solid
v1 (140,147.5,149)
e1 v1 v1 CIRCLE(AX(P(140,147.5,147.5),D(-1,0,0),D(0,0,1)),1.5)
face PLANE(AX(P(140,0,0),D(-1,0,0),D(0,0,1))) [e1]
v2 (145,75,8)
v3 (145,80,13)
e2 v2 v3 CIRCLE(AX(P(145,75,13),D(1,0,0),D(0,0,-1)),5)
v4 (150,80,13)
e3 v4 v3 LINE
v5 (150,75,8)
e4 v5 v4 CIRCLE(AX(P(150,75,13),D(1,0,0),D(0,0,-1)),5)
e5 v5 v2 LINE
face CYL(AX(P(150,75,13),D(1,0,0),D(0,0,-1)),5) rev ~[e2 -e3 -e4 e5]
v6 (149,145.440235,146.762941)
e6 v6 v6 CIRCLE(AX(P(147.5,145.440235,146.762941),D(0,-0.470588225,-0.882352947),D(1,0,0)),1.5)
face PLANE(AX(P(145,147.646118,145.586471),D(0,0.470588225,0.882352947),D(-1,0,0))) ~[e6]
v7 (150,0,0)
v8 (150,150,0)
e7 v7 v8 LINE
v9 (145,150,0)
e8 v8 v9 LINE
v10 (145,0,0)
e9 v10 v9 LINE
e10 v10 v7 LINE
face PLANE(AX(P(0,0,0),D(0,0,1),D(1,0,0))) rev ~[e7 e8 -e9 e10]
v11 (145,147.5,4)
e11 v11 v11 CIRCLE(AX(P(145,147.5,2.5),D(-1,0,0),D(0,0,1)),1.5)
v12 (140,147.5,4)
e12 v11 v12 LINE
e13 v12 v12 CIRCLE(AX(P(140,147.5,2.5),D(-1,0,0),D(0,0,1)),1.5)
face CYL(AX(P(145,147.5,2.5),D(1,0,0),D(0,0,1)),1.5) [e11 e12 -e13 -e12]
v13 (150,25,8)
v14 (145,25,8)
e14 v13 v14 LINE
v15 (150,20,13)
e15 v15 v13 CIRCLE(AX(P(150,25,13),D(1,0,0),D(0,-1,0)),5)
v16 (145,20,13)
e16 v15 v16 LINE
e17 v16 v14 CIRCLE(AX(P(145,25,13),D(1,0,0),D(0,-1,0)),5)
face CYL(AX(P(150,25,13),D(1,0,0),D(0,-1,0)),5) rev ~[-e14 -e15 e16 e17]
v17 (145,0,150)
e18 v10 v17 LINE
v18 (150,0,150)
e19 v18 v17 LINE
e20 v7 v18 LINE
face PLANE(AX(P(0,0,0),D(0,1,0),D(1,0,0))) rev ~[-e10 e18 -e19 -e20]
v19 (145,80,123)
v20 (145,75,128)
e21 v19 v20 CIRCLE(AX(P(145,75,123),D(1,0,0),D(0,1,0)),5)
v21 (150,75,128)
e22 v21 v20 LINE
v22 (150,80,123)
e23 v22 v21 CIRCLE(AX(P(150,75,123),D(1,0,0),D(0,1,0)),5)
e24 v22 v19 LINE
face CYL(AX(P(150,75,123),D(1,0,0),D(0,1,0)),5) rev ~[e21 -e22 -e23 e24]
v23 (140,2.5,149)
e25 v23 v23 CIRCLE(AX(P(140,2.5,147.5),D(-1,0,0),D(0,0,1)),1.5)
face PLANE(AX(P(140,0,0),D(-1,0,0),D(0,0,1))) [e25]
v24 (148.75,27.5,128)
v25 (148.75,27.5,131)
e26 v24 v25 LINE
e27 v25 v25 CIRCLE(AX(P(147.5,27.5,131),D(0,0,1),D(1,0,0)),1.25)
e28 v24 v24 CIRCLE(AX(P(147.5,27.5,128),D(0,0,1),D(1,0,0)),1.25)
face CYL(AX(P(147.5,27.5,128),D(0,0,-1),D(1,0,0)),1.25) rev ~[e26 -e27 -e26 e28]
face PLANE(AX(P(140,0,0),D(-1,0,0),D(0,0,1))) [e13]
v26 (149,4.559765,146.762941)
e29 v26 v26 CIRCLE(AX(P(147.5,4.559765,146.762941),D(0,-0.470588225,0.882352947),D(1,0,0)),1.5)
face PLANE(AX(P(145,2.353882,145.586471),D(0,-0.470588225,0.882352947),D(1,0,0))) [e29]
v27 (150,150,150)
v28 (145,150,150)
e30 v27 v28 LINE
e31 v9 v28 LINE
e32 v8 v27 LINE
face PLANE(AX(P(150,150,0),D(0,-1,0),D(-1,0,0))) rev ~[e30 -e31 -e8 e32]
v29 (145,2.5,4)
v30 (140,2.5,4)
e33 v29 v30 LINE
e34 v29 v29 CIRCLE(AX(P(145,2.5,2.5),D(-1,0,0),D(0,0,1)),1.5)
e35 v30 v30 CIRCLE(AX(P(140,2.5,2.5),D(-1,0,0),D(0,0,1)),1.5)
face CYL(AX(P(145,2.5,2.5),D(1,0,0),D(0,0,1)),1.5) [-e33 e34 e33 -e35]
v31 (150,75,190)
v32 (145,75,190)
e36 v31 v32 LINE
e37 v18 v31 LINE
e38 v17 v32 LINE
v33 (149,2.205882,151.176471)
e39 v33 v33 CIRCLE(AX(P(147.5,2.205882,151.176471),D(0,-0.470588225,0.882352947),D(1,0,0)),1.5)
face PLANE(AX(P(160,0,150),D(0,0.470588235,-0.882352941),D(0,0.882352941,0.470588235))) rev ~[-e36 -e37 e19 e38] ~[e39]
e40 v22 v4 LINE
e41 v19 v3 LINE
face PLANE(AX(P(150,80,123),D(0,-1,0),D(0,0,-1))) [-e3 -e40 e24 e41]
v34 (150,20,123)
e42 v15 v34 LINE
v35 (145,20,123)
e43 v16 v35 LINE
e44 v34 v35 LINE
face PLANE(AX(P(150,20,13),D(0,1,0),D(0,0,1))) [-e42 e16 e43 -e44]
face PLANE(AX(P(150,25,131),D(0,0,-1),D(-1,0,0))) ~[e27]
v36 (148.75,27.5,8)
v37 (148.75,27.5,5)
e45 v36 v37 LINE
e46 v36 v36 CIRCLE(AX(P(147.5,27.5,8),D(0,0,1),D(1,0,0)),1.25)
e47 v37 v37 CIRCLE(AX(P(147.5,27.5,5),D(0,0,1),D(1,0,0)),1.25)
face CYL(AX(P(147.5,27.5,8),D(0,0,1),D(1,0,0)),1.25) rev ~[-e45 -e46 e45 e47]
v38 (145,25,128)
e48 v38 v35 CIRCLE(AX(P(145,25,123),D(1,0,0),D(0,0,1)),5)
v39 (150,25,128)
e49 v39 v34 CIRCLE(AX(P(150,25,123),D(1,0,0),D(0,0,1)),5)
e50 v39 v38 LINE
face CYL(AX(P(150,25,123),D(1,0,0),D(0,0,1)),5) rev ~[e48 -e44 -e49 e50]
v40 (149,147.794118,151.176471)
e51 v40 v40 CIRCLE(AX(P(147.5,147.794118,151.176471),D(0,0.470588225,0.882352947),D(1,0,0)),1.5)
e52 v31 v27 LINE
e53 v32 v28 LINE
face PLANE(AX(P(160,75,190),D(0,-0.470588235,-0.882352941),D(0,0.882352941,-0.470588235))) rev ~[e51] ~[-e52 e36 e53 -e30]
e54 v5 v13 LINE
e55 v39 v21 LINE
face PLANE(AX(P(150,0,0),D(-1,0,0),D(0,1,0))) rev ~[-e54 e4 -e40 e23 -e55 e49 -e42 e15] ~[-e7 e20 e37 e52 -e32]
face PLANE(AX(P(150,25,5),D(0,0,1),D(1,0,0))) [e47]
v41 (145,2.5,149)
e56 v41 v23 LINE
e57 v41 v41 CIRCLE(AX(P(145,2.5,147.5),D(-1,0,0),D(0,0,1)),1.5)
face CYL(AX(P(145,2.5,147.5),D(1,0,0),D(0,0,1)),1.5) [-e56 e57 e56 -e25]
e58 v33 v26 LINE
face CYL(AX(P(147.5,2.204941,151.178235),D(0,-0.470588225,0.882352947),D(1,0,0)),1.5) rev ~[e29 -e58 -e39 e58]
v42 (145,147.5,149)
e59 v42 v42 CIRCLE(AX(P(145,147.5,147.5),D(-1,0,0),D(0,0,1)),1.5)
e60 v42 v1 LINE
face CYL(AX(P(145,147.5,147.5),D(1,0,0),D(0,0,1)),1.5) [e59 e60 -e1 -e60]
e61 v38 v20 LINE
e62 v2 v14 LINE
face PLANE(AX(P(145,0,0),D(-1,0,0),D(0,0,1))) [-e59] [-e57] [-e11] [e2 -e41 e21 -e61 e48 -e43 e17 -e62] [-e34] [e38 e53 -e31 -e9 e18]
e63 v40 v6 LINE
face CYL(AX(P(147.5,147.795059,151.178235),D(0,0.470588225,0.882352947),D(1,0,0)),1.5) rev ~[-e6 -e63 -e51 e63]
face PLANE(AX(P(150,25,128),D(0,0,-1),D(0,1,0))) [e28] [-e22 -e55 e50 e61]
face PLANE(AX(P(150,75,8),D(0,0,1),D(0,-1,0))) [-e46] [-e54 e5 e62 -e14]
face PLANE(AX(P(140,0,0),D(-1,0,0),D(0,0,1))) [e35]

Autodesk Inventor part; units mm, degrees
sketch "Boceto1" plane through (0, 0, 0) normal (0, 0, 1) x (1, 0, 0)
  line L0 (0, 0) -> (150, 0)
  line L1 (150, 0) -> (150, 150)
  line L2 (150, 150) -> (0, 150)
  line L3 (0, 150) -> (0, 0)
  line L4 (5, 145) -> (145, 145)
  line L5 (145, 145) -> (145, 5)
  line L6 (145, 5) -> (5, 5)
  line L7 (5, 5) -> (5, 145)
  dimension "d0" = 150
  dimension "d1" = 150
  dimension "d2" = 5
extrude "Extrusión1" add sketch "Boceto1" along normal blind 150
sketch "Boceto2" plane through (150, 0, 0) normal (1, 0, 0) x (0, 0, -1)
  line L0 (-150, 0) -> (-150, 150) projected
  line L1 (-150, 75) -> (-190, 75) construction
  line L2 (-190, 75) -> (-150, 150)
  line L3 (0, 0) -> (-150, 0) construction
  line L4 (-150, 0) -> (-190, 75)
  dimension "d5" = 40
extrude "Extrusión2" add sketch "Boceto2" against normal blind 5
ref_plane "Plano de trabajo1" through (75, 0, 0) normal (1, 0, 0) x (0, 0, -1)
mirror "Simetría1" about plane through (75, 0, 0) normal (1, 0, 0) of "Extrusión2"
sketch "Boceto3" plane through (0, 150, 0) normal (0, 1, 0) x (1, 0, 0)
  line L0 (105, -60) -> (45, -60)
  line L1 (45, -60) -> (45, -95)
  line L2 (60, -110) -> (90, -110)
  line L3 (105, -95) -> (105, -60)
  line L4 (150, 0) -> (0, 0) projected
  line L5 (145, -150) -> (5, -150) projected
  arc A0 (90, -110) -> (105, -95) centre (90, -95) ccw
  arc A1 (45, -95) -> (60, -110) centre (60, -95) ccw
  point P0 (45, -110)
  point P1 (105, -110)
  point P2 (75, -60)
  point P3 (75, 0)
  dimension "d8" = 60
  dimension "d9" = 50
  dimension "d10" = 40
  dimension "d11" = 15
extrude "Extrusión3" cut sketch "Boceto3" against normal through all
sketch "Boceto4" plane through (150, 0, 0) normal (1, 0, 0) x (0, 0, -1)
  line L0 (-13, 20) -> (-123, 20)
  line L1 (-128, 25) -> (-128, 75)
  line L2 (-123, 80) -> (-13, 80)
  line L3 (-8, 75) -> (-8, 25)
  line L4 (0, 0) -> (0, 150) projected
  line L5 (0, 0) -> (-150, 0) projected
  arc A0 (-123, 80) -> (-128, 75) centre (-123, 75) ccw
  arc A1 (-8, 75) -> (-13, 80) centre (-13, 75) ccw
  arc A2 (-13, 20) -> (-8, 25) centre (-13, 25) ccw
  arc A3 (-128, 25) -> (-123, 20) centre (-123, 25) ccw
  point P0 (-128, 80)
  point P1 (-128, 20)
  point P2 (-8, 80)
  dimension "d14" = 120
  dimension "d15" = 60
  dimension "d16" = 8
  dimension "d17" = 20
  dimension "d18" = 5
extrude "Extrusión4" cut sketch "Boceto4" against normal up to surface (5 mm away)
sketch "Boceto5" plane through (0, 0, 0) normal (-1, 0, 0) x (0, 0, 1)
  line L0 (65, 125) -> (115, 125)
  line L1 (120, 120) -> (120, 30)
  line L2 (115, 25) -> (65, 25)
  line L3 (60, 30) -> (60, 120)
  line L4 (0, 150) -> (0, 0) projected
  arc A0 (120, 120) -> (115, 125) centre (115, 120) ccw
  arc A1 (115, 25) -> (120, 30) centre (115, 30) ccw
  arc A2 (65, 125) -> (60, 120) centre (65, 120) ccw
  arc A3 (60, 30) -> (65, 25) centre (65, 30) ccw
  point P0 (60, 150)
  point P1 (120, 25)
  point P2 (120, 125)
  point P3 (60, 25)
  point P4 (60, 75)
  point P5 (0, 75)
  dimension "d21" = 60
  dimension "d22" = 100
  dimension "d23" = 60
  dimension "d24" = 5
extrude "Extrusión5" cut sketch "Boceto5" against normal blind 10
sketch "Boceto6" plane through (150, 0, 0) normal (1, 0, 0) x (0, 0, -1)
  line L0 (-190, 75) -> (-150, 0) projected
  line L1 (-150, 150) -> (-190, 75) projected
  line L2 (-154.4118, 152.3529) -> (-195.6667, 75)
  line L3 (-195.6667, 75) -> (-154.4118, -2.3529)
  line L4 (-154.4118, 152.3529) -> (-144.4118, 152.3529)
  line L5 (-144.4118, 152.3529) -> (-144.4118, 150)
  line L6 (-154.4118, -2.3529) -> (-144.4118, -2.3529)
  line L7 (-144.4118, -2.3529) -> (-144.4118, 0)
  line L8 (0, 0) -> (-150, 0) projected
  line L9 (0, 150) -> (-150, 150) projected
  dimension "d27" = 5
  dimension "d28" = 10
extrude "Extrusión6" add sketch "Boceto6" along normal blind 10 and the other way blind 160
fillet "Empalme1" radius 5 3 edges at (75, 152.3529, 154.4118) (75, 75, 195.6667) (75, -2.3529, 154.4118)
sketch "Boceto7" plane through (150, 25, 8) normal (0, 0, 1) x (1, 0, 0)
  circle A0 centre (-2.5, 2.5) radius 1.25
  line L0 (0, 50) -> (0, 0) projected
  line L1 (0, 0) -> (-5, 0) projected
  point P0 (-150, -25)
  point P1 (-2.5, 0)
  dimension "d34" = 2.5
  dimension "d35" = 2.5
  dimension "d36" = 2.5
extrude "Extrusión7" cut sketch "Boceto7" against normal blind 3
ref_plane "Plano de trabajo2" through (150, 25, 68) normal (0, 0, 1) x (1, 0, 0)
mirror "Simetría2" about plane through (150, 25, 68) normal (0, 0, 1) of "Extrusión7"
sketch "Boceto8" plane through (160, 0, 0) normal (1, 0, 0) x (0, 0, -1)
  arc A0 (-155.8235, 0.2941) -> (-151.4118, -2.3529) centre (-151.4118, 2.6471) ccw projected
  line L0 (-151.4118, -2.3529) -> (-144.4118, -2.3529) projected
  line L1 (-144.4118, -2.3529) -> (-144.4118, 0) projected
  line L2 (-144.4118, 0) -> (-150, 0) projected
  line L3 (-150, 0) -> (-190, 75) projected
  line L4 (-190, 75) -> (-150, 150) projected
  line L5 (-150, 150) -> (-144.4118, 150) projected
  line L6 (-144.4118, 150) -> (-144.4118, 152.3529) projected
  line L7 (-144.4118, 152.3529) -> (-151.4118, 152.3529) projected
  arc A1 (-151.4118, 152.3529) -> (-155.8235, 149.7059) centre (-151.4118, 147.3529) ccw projected
  line L8 (-155.8235, 149.7059) -> (-194.4118, 77.3529) projected
  arc A2 (-194.4118, 77.3529) -> (-194.4118, 72.6471) centre (-190, 75) ccw projected
  line L9 (-194.4118, 72.6471) -> (-155.8235, 0.2941) projected
  point P0 (0, 0)
extrude "Extrusión8" cut sketch "Boceto8" against normal through all
sketch "Boceto9" plane through (145, 0, 150) normal (0, -0.4705882, 0.8823529) x (1, 0, 0)
  circle A0 centre (2.5, 2.5) radius 1.5
  line L0 (5, 85) -> (5, 0) projected
  line L1 (5, 0) -> (0, 0) projected
  point P0 (-145, -70.5882)
  dimension "d41" = 3
  dimension "d42" = 2.5
  dimension "d43" = 2.5
extrude "Extrusión9" cut sketch "Boceto9" against normal blind 5
ref_plane "Plano de trabajo3" through (75, 0, 0) normal (1, 0, 0) x (0, 0, -1)
ref_plane "Plano de trabajo4" through (0, 75, 0) normal (0, -1, 0) x (1, 0, 0)
mirror "Simetría3" about plane through (75, 0, 0) normal (1, 0, 0) of "Extrusión9"
mirror "Simetría4" about plane through (0, 75, 0) normal (0, -1, 0) of "Extrusión8", "Extrusión9", "Simetría3"
sketch "Boceto10" plane through (0, 0, 0) normal (-1, 0, 0) x (0, 0, 1)
  line L0 (190, 75) -> (150, 0) projected
  line L1 (0, 0) -> (150, 0) projected
  arc A0 (115, 25) -> (120, 30) centre (115, 30) ccw projected
  line L2 (115, 25) -> (65, 25) projected
  arc A1 (60, 30) -> (65, 25) centre (65, 30) ccw projected
  line L3 (60, 30) -> (60, 120) projected
  arc A2 (65, 125) -> (60, 120) centre (65, 120) ccw projected
  line L4 (65, 125) -> (115, 125) projected
  arc A3 (120, 120) -> (115, 125) centre (115, 120) ccw projected
  line L5 (120, 120) -> (120, 30) projected
  line L6 (0, 150) -> (0, 0) projected
  line L7 (0, 0) -> (150, 0) projected
  line L8 (190, 75) -> (150, 0) projected
  line L9 (150, 150) -> (190, 75) projected
  line L10 (0, 150) -> (150, 150) projected
  line L11 (0, 150) -> (150, 150) projected
  line L12 (150, 150) -> (190, 75) projected
extrude "Extrusión10" cut sketch "Boceto10" against normal up to surface (145 mm away) contours L0 L1 L6 L10 L9 | L2 A1 L3 A2 L4 A3 L5 A0
sketch "Boceto11" plane through (145, 0, 0) normal (-1, 0, 0) x (0, 0, 1)
  circle A0 centre (147.5, 2.5) radius 1.5
  line L0 (0, 0) -> (150, 0) projected
  line L1 (75, 0) -> (75, 157.0348) construction
  line L2 (0, 0) -> (0, 150) projected
  line L3 (0, 75) -> (163.5467, 75) construction
  circle A1 centre (147.5, 147.5) radius 1.5
  circle A2 centre (2.5, 2.5) radius 1.5
  circle A3 centre (2.5, 147.5) radius 1.5
  dimension "d48" = 2.5
  dimension "d49" = 3
  dimension "d50" = 2.5
extrude "Extrusión11" add sketch "Boceto11" along normal blind 5
properties part number "CasaJugueteAPM" material "Plástico ABS"
